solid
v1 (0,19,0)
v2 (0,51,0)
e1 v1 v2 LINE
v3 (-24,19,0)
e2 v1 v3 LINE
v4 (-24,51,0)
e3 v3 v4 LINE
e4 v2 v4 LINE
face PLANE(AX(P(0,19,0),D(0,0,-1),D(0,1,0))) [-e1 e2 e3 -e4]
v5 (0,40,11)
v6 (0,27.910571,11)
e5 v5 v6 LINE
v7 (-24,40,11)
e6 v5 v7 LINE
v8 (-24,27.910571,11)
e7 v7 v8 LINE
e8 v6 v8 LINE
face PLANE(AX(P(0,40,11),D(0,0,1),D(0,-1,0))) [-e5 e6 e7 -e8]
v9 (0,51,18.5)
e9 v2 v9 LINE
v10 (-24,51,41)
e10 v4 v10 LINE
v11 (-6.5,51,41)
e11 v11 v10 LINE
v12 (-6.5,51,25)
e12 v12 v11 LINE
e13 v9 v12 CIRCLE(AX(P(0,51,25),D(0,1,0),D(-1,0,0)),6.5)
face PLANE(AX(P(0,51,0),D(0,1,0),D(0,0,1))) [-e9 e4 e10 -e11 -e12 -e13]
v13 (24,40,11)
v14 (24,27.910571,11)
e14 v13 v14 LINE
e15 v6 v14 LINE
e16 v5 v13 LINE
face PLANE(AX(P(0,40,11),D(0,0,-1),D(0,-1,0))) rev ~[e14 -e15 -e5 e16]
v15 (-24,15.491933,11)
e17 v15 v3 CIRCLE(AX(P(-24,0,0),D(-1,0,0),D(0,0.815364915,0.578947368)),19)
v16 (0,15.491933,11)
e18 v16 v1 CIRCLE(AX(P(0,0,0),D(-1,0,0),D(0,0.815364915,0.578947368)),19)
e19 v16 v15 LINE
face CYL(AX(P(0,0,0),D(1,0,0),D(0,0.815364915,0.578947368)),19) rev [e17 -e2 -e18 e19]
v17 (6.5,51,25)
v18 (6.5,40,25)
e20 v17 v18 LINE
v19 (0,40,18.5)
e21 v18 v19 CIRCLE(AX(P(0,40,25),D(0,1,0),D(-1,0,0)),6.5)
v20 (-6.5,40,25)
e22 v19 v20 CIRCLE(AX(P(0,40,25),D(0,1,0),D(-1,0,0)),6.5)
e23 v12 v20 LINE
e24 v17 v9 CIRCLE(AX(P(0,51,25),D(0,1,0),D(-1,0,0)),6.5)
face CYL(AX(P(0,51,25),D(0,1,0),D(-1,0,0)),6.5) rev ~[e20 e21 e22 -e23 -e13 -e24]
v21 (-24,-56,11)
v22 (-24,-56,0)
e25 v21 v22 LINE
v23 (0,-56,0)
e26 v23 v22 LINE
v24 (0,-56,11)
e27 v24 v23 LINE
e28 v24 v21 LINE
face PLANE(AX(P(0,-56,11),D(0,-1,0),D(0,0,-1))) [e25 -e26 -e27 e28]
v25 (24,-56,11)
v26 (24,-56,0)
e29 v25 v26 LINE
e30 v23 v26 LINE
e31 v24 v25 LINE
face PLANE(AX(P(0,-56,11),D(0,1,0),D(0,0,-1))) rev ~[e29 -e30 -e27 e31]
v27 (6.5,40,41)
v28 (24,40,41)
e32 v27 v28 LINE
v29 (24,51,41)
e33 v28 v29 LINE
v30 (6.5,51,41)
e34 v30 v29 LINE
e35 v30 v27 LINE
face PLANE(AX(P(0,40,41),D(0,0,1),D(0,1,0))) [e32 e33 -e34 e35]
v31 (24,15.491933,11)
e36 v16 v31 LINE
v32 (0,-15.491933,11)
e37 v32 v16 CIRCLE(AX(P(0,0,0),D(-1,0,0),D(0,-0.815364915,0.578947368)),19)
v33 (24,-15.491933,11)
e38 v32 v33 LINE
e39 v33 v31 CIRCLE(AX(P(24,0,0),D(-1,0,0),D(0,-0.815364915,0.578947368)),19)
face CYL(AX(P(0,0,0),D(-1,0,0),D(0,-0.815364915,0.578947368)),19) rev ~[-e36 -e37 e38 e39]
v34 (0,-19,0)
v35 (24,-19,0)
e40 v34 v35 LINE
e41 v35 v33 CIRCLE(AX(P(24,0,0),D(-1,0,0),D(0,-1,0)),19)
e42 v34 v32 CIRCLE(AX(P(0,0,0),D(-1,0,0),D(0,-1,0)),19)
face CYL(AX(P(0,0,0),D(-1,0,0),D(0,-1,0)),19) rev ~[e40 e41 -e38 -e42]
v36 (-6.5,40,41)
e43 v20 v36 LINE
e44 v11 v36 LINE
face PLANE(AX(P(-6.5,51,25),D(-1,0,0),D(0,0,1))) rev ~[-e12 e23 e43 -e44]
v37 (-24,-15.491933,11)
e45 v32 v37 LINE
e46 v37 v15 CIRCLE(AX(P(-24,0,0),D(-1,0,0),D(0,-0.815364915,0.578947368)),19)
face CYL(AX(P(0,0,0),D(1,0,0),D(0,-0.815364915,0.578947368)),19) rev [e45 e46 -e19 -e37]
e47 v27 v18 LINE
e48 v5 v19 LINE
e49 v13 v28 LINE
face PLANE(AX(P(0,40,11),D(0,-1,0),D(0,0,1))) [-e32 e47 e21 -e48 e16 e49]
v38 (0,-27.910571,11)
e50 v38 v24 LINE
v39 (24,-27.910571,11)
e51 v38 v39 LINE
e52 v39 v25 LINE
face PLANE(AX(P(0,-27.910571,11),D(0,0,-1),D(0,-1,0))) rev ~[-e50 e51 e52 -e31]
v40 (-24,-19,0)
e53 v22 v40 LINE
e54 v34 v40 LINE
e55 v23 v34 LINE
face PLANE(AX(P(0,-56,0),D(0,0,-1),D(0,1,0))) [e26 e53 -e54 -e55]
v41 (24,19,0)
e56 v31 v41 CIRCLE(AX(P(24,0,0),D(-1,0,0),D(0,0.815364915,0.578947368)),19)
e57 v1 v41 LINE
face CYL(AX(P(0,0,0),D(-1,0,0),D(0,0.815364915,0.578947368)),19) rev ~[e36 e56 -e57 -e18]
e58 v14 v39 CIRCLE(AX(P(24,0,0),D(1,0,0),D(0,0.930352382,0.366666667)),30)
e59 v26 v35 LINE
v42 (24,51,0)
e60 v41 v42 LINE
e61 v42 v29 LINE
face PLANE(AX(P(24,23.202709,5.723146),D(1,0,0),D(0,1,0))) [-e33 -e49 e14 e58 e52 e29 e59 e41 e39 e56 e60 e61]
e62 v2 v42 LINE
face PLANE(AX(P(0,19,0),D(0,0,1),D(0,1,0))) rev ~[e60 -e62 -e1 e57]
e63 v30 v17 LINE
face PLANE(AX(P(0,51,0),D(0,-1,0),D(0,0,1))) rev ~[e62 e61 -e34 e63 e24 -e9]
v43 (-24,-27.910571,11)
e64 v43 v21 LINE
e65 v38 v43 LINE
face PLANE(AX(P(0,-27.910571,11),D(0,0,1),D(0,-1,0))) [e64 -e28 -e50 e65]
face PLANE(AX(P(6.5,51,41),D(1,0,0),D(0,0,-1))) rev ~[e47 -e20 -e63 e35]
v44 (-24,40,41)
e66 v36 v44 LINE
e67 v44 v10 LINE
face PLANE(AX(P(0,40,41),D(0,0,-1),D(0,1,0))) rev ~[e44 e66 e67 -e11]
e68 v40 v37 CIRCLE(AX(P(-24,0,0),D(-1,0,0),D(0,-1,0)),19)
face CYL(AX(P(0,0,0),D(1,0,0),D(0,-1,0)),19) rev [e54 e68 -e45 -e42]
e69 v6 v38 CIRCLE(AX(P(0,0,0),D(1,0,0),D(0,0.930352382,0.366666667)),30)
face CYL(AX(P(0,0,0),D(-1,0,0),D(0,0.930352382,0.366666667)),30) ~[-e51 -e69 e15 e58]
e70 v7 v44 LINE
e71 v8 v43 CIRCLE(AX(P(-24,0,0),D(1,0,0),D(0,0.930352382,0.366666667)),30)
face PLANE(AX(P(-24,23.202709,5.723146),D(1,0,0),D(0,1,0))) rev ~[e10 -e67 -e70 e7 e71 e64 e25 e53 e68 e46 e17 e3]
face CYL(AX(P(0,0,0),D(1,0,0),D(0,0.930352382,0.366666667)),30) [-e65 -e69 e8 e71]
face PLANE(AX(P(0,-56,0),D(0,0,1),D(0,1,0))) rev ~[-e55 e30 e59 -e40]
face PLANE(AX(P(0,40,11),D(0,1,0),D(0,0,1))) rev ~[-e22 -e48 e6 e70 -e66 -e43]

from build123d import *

# Parameters (mm, degrees)
F0_W     = 11
F0_H     = 30
F1_DEPTH = 24
F3_DEPTH = 11


# Not quite as in the source:
# - a feature of the source that left no trace in its solid (it failed there, or was rolled back) is left out


with BuildPart() as f1:
    # F0 (on Right) → F1 (new body, symmetric)
    with BuildSketch(Plane.YZ):
        with BuildLine():
            ThreePointArc((15.4919333848, 11), (18.1017503893, 5.7729223833), (19, 0))
            Line((19, 0), (30, 0))
            ThreePointArc((30, 0), (29.4730143031, 5.5983415304), (27.9105714739, 11))
            Line((27.9105714739, 11), (15.4919333848, 11))
        make_face()
        with BuildLine():
            ThreePointArc((-15.4919333848, 11), (0, 19), (15.4919333848, 11))
            Line((15.4919333848, 11), (27.9105714739, 11))
            ThreePointArc((27.9105714739, 11), (0, 30), (-27.9105714739, 11))
            Line((-27.9105714739, 11), (-15.4919333848, 11))
        make_face()
        with BuildLine():
            Line((-30, 0), (-19, 0))
            ThreePointArc((-19, 0), (-18.1017503893, 5.7729223833), (-15.4919333848, 11))
            Line((-15.4919333848, 11), (-27.9105714739, 11))
            ThreePointArc((-27.9105714739, 11), (-29.4730143031, 5.5983415304), (-30, 0))
        make_face()
        with BuildLine():
            ThreePointArc((27.9105714739, 11), (29.4730143031, 5.5983415304), (30, 0))
            Line((30, 0), (51, 0))
            Line((51, 0), (51, 11))
            Line((51, 11), (40, 11))
            Line((40, 11), (27.9105714739, 11))
        make_face()
        with BuildLine():
            Line((-56, 0), (-30, 0))
            ThreePointArc((-30, 0), (-29.4730143031, 5.5983415304), (-27.9105714739, 11))
            Line((-27.9105714739, 11), (-56, 11))
            Line((-56, 11), (-56, 0))
        make_face()
        with Locations((45.5, 26)):
            Rectangle(F0_W, F0_H)
    extrude(amount=F1_DEPTH, both=True)

    # F2 (on face) → F3 (cut, through all)
    with BuildSketch(Plane(origin=(0, 51, 0), x_dir=(-1, 0, 0), z_dir=(0, 1, 0))):
        with BuildLine():
            ThreePointArc((-6.5, 25), (0, 18.5), (6.5, 25))
            ThreePointArc((6.5, 25), (0, 31.5), (-6.5, 25))
        make_face()
        with BuildLine():
            ThreePointArc((-6.5, 25), (0, 31.5), (6.5, 25))
            Line((6.5, 25), (6.5, 41))
            Line((6.5, 41), (-6.5, 41))
            Line((-6.5, 41), (-6.5, 25))
        make_face()
    extrude(amount=-F3_DEPTH, mode=Mode.SUBTRACT)


solid = f1.part
